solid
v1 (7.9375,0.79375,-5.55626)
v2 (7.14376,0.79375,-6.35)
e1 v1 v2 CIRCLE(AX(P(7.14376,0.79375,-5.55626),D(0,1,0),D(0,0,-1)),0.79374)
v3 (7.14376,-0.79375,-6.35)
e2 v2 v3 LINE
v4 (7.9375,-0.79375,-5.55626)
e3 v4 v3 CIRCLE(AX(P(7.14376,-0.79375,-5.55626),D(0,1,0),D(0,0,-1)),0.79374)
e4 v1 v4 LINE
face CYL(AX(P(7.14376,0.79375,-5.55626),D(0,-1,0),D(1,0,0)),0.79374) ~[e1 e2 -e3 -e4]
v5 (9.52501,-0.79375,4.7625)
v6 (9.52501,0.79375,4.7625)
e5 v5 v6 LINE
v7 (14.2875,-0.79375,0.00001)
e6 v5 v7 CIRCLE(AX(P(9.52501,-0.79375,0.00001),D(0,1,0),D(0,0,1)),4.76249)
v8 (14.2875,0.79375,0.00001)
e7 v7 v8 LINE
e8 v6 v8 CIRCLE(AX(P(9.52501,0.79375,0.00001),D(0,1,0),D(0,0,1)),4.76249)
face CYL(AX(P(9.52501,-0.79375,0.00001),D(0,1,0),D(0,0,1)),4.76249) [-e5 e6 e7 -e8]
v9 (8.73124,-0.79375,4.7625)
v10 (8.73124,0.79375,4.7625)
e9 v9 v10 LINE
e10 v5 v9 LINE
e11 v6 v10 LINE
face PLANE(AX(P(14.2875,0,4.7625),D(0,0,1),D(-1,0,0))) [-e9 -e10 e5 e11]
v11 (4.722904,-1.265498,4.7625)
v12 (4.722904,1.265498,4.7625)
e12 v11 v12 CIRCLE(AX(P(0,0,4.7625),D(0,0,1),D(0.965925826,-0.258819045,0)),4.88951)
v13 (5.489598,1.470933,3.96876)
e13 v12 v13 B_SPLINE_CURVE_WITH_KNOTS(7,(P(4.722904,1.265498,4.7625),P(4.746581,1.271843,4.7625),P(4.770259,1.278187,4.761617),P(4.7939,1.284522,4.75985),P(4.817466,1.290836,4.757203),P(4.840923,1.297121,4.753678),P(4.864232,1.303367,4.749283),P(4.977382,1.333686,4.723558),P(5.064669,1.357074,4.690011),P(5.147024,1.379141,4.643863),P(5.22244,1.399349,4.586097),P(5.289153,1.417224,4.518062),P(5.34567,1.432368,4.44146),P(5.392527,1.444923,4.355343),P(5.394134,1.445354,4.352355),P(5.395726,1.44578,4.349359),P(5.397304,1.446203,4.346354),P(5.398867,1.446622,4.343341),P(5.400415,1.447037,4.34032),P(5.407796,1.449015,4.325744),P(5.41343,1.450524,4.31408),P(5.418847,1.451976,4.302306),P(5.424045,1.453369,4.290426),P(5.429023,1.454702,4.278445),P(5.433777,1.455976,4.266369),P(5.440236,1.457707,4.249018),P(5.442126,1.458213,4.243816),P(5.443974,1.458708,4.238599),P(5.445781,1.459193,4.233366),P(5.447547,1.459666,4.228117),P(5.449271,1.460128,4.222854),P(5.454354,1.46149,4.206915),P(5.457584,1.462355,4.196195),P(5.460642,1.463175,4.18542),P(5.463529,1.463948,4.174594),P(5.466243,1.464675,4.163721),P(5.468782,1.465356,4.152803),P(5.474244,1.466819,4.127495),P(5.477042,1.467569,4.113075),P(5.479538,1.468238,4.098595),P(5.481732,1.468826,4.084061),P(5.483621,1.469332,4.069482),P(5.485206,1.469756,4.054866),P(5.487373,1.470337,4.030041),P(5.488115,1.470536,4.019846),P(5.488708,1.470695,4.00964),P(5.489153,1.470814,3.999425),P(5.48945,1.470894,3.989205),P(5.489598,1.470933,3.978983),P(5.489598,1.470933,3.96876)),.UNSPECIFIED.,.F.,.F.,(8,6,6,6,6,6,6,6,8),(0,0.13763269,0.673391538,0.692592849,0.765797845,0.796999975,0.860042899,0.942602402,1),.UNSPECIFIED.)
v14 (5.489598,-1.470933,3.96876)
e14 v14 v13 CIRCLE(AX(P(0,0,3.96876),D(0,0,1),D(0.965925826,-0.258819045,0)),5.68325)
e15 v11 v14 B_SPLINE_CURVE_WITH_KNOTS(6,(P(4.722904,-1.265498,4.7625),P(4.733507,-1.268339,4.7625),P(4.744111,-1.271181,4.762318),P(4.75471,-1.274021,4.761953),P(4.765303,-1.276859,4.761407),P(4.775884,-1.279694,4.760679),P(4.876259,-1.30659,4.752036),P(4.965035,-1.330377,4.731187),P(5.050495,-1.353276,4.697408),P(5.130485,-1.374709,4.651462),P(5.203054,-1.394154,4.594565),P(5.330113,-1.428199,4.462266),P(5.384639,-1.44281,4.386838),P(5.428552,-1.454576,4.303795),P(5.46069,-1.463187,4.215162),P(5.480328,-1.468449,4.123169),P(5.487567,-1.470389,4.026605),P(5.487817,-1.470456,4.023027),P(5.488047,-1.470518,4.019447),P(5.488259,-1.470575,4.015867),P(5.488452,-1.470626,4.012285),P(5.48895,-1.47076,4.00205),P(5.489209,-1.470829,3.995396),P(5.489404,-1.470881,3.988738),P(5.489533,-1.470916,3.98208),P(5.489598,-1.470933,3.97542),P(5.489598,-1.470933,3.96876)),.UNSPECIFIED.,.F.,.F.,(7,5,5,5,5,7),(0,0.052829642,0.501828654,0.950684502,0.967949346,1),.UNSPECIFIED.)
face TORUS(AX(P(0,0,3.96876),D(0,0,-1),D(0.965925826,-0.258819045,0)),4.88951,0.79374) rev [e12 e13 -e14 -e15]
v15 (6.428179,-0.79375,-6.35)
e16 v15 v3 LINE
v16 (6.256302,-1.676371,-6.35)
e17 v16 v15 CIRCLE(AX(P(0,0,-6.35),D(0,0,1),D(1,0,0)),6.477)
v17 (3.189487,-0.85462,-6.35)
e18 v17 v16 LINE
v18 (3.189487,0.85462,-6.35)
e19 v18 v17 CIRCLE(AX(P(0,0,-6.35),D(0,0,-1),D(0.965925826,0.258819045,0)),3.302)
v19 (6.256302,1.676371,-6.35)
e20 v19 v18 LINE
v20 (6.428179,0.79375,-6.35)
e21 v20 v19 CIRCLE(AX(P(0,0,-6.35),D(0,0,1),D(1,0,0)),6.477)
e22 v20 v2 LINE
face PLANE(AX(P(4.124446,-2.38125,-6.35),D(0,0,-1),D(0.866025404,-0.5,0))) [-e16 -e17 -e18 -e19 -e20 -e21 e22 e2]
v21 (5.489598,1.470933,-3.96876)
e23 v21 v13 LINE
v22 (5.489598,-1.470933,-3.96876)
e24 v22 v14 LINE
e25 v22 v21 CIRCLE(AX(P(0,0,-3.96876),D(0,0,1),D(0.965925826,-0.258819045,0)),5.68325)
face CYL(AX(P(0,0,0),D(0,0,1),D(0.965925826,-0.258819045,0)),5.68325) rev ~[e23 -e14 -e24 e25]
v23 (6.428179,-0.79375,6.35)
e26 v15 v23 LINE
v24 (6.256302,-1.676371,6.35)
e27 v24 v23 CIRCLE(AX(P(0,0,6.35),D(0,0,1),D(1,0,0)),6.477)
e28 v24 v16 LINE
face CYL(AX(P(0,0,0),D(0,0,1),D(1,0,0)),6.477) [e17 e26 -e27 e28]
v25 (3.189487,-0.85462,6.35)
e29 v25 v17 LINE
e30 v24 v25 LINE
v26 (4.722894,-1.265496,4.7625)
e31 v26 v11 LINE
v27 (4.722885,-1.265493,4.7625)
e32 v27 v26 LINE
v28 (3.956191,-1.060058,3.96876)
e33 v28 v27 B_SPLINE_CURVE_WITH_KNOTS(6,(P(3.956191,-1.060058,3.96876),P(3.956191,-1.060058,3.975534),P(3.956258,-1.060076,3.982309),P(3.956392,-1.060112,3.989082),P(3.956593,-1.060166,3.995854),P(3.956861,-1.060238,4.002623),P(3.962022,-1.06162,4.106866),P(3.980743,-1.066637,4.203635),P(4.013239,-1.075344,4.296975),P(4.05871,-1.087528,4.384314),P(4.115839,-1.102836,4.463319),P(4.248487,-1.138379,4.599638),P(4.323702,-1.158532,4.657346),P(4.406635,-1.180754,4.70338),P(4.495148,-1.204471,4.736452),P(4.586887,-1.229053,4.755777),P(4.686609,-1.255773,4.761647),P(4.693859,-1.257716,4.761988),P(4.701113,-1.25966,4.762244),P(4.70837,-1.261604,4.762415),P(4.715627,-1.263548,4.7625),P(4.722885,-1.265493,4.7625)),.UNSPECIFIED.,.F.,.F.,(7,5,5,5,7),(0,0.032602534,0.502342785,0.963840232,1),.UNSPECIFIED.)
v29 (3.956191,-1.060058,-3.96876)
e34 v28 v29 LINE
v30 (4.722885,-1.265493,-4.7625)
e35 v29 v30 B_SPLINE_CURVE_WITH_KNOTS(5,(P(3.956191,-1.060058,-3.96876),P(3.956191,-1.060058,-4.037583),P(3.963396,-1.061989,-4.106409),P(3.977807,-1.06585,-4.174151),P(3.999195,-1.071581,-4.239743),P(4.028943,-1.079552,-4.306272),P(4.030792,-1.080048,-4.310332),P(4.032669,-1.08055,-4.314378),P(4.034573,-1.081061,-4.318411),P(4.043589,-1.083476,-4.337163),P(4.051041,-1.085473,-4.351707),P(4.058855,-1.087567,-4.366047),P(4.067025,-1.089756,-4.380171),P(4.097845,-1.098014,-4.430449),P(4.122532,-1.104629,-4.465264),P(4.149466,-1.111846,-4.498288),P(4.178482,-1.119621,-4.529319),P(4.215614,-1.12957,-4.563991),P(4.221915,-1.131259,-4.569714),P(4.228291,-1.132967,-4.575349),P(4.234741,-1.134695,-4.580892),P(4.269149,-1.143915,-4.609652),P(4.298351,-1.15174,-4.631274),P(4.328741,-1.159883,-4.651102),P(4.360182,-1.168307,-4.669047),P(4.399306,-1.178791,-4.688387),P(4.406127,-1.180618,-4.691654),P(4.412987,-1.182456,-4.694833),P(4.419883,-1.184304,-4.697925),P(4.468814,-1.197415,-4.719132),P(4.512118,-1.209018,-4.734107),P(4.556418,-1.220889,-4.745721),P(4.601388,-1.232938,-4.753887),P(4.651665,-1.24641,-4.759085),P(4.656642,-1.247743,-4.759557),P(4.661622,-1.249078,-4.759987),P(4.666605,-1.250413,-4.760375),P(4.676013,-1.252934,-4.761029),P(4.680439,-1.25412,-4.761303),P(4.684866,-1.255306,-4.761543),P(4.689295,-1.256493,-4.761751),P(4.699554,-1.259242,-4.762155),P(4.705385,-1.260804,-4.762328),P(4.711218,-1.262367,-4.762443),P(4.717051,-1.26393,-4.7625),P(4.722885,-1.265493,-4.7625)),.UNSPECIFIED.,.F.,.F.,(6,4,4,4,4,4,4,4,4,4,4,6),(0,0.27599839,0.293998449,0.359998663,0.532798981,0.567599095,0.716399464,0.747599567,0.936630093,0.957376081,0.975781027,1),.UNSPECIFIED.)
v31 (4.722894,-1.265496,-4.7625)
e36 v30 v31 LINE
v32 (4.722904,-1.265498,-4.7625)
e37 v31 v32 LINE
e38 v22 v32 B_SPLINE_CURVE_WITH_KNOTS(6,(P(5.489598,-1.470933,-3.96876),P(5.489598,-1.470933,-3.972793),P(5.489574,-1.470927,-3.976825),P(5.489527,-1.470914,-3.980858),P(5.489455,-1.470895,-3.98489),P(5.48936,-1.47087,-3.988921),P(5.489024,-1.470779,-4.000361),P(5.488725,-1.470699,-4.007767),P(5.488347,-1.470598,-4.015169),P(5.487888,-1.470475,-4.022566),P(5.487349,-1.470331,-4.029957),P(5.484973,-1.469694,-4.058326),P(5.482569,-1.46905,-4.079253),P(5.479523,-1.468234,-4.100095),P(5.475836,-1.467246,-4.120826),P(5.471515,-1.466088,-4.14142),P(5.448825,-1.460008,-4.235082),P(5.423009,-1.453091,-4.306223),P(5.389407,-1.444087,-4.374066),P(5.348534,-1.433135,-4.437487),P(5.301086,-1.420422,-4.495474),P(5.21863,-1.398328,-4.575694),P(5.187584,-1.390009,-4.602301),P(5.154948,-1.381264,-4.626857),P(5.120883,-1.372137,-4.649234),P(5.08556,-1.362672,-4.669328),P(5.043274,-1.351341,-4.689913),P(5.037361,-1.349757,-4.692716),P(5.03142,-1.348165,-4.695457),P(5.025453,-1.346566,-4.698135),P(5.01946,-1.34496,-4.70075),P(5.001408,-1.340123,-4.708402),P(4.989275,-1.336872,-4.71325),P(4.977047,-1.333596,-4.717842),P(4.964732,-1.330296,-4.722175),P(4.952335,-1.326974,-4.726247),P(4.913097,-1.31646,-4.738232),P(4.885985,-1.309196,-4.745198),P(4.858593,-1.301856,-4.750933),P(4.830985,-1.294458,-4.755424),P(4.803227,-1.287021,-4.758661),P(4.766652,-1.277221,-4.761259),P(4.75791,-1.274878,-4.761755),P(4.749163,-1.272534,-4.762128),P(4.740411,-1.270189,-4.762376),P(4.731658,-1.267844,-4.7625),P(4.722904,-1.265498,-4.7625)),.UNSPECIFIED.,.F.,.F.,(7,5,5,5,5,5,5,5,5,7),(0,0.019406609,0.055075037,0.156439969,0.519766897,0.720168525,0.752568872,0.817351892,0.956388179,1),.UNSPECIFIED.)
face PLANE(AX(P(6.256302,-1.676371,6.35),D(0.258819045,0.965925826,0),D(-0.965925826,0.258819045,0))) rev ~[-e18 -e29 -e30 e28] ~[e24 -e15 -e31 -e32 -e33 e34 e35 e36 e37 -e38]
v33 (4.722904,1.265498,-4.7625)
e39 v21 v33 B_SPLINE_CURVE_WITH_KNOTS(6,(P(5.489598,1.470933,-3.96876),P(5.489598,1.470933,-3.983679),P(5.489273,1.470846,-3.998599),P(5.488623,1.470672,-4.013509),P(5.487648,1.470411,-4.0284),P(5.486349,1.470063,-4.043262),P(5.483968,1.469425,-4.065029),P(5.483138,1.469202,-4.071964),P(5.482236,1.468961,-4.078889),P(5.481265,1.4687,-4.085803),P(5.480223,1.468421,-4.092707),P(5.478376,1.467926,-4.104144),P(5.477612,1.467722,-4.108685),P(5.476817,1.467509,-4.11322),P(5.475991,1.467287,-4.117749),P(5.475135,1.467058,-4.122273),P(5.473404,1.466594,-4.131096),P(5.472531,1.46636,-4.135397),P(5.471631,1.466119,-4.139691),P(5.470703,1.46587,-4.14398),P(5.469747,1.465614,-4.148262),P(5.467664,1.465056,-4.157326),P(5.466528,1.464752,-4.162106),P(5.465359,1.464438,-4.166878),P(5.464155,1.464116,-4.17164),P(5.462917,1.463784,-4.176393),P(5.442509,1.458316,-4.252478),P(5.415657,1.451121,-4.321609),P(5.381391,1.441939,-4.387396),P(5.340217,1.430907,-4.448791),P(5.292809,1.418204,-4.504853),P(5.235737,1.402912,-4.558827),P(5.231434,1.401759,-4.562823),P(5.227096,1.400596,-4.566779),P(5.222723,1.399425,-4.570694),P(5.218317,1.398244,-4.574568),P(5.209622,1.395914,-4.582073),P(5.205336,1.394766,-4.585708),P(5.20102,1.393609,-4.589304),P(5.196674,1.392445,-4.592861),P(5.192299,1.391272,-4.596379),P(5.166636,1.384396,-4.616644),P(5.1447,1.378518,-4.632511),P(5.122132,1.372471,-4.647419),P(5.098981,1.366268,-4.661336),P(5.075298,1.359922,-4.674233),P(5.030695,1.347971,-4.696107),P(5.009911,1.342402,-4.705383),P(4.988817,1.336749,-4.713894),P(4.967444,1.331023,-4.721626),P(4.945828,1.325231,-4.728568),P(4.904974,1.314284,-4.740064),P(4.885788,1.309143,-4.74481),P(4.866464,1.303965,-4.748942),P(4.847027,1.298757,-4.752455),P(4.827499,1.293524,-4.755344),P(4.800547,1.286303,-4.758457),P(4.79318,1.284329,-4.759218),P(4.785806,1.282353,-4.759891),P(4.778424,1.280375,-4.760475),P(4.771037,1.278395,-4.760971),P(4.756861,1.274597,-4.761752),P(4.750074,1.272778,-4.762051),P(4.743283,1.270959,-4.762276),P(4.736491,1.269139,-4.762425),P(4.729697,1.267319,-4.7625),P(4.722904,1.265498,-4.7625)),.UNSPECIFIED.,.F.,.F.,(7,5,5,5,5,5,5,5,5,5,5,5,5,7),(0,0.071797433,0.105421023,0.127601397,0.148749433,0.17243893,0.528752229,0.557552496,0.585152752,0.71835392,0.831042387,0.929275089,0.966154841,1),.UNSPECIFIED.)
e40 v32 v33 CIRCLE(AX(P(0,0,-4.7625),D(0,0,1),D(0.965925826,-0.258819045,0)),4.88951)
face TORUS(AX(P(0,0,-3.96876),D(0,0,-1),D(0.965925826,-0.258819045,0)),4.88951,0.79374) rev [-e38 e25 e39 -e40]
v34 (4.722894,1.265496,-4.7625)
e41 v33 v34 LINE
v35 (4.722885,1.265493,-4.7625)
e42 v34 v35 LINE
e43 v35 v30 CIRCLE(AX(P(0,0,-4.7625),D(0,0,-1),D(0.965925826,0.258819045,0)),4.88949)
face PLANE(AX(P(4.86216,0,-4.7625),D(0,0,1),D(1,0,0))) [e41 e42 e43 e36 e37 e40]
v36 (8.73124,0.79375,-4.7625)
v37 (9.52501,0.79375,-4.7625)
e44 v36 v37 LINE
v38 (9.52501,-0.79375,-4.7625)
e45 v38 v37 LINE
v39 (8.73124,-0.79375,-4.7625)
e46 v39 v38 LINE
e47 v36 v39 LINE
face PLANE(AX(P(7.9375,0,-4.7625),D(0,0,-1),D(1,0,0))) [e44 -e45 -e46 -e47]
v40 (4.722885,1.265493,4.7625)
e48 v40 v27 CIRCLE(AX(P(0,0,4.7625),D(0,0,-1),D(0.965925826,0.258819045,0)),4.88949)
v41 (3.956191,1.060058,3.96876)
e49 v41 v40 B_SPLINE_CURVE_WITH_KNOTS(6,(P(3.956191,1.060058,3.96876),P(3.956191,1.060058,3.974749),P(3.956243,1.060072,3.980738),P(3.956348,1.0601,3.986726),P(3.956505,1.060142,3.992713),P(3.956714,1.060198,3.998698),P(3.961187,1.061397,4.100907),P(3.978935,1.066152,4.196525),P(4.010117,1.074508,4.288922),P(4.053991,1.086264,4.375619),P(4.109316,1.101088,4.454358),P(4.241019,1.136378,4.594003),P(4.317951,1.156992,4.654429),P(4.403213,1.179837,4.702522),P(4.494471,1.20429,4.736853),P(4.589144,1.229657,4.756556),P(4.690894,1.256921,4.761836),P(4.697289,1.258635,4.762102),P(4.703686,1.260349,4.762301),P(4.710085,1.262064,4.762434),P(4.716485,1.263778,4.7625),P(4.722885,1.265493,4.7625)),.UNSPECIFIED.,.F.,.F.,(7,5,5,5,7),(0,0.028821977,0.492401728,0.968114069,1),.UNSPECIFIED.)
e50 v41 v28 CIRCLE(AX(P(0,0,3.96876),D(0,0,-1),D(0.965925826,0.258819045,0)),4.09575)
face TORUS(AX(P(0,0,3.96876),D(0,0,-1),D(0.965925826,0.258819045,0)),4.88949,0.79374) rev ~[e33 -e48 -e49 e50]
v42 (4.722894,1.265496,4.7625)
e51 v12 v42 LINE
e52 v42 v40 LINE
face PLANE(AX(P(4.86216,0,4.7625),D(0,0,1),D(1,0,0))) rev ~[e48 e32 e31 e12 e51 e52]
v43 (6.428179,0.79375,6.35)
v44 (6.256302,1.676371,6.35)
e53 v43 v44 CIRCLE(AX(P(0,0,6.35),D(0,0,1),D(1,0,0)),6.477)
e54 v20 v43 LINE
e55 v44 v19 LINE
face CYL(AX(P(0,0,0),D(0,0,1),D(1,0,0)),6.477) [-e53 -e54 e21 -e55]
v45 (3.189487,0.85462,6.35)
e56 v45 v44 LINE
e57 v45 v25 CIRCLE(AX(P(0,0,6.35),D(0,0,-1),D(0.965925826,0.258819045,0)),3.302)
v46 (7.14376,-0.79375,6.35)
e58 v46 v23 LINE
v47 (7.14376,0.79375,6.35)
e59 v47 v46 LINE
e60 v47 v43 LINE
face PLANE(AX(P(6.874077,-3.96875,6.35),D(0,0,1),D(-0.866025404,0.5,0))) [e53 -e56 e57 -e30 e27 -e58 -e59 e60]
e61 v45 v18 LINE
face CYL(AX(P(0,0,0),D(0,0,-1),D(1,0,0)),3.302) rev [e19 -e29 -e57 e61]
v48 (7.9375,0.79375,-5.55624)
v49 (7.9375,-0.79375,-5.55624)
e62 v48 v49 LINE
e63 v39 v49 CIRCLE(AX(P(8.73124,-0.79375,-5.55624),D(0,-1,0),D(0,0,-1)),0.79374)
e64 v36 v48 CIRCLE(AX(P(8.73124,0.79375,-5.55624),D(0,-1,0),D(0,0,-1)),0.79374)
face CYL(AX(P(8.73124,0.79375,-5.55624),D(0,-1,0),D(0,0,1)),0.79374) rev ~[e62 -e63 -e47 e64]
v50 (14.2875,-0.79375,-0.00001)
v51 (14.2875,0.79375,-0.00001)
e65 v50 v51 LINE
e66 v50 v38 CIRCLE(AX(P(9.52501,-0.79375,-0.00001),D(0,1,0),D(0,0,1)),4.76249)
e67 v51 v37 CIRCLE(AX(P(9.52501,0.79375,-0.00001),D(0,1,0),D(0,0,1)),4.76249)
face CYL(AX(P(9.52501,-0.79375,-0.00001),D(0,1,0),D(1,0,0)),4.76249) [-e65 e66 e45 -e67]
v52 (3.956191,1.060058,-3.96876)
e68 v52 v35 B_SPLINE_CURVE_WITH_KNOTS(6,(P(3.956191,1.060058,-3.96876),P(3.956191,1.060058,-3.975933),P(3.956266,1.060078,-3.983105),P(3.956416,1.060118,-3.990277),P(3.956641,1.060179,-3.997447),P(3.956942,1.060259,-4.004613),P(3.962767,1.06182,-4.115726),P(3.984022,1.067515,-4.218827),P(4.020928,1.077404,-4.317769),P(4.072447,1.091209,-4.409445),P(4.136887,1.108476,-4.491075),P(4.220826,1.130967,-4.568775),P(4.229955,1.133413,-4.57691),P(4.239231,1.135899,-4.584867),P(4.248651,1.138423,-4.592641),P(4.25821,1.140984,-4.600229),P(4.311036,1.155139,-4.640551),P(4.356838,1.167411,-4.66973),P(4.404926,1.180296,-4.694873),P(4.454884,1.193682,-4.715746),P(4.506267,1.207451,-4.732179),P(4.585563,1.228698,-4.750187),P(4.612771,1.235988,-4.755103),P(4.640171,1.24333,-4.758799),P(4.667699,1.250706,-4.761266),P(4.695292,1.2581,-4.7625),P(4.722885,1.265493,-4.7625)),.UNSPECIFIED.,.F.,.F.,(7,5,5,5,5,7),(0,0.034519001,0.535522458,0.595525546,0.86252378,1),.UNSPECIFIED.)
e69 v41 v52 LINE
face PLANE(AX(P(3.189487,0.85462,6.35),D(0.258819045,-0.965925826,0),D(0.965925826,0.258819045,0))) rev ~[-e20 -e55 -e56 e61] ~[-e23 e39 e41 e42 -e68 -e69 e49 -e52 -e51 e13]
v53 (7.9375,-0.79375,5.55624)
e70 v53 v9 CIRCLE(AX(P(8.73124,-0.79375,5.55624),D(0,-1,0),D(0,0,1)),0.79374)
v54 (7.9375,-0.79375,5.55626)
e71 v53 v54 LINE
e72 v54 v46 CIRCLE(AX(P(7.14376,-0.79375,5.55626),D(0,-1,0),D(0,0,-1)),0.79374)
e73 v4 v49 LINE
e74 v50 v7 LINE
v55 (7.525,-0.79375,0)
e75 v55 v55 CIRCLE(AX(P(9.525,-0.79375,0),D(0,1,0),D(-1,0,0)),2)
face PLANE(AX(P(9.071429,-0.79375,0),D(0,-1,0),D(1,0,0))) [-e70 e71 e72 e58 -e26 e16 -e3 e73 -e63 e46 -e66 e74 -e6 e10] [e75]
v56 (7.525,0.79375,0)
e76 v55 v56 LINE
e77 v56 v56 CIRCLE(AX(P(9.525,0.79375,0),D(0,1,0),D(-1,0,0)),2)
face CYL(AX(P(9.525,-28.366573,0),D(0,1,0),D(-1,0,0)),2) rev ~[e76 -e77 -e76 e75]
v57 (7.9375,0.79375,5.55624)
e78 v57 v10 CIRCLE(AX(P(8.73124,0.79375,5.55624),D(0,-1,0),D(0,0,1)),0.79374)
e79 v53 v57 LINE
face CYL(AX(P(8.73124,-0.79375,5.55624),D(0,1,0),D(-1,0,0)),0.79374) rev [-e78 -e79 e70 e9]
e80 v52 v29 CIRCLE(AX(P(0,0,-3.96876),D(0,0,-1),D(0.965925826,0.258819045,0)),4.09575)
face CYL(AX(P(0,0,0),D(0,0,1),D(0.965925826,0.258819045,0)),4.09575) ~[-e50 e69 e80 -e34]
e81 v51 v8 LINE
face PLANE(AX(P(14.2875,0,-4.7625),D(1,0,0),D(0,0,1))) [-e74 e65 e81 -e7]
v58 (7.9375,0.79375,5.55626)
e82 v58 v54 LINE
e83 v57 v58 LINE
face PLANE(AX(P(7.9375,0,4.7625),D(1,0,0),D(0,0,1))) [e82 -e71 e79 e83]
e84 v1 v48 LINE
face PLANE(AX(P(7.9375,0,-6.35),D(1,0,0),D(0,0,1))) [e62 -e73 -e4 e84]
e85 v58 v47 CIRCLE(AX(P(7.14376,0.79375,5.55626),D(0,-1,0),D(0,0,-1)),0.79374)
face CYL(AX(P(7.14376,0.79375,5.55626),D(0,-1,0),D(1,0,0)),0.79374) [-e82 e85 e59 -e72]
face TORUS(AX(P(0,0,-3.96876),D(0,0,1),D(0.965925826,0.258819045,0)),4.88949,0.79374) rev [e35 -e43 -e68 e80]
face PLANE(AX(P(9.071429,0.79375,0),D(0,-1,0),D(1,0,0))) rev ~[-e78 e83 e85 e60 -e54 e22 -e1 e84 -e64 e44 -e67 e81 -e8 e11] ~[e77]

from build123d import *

# Parameters (mm, degrees)
F0_R      = 6.477
F0_R_2    = 3.302
F1_DEPTH  = 6.35
F3_DEPTH  = 0.79375
F4_R      = 0.79374
F5_R      = 4.76249
F7_D      = 4
F8_COUNT  = 12
F10_DEPTH = 12.701
F12_DEPTH = 4.7625
F13_R     = 0.79374


# Not quite as in the source:
# - a fillet or chamfer is up to 0.001 mm smaller than in the source, because OpenCascade refuses the exact size


with BuildPart() as f1:
    # F0 (on Top) → F1 (new body, symmetric)
    with BuildSketch(Plane.XY):
        Circle(F0_R)
        Circle(F0_R_2, mode=Mode.SUBTRACT)
    extrude(amount=F1_DEPTH, both=True)

    # F2 (on Front) → F3 (join, symmetric)
    with BuildSketch(Plane.XZ):
        Polygon((7.9375, 4.7625), (7.9375, 6.35), (4.7625, 6.35), (4.7625, -6.35), (7.9375, -6.35), (7.9375, -4.7625), (14.2875, -4.7625), (14.2875, 0), (14.2875, 4.7625), align=None)
    extrude(amount=F3_DEPTH, both=True)

    # F4 (radius 0.79375 in the source; OpenCascade refuses exactly that, so slightly less here)
    f4_edges = [f1.edges().sort_by_distance(p)[0] for p in [
        (7.9375, 0, 6.35),
        (7.9375, 0, 4.7625),
        (7.9375, 0, -6.35),
        (7.9375, 0, -4.7625),
    ]]
    fillet(f4_edges, radius=F4_R)

    # F5 (radius 4.7625 in the source; OpenCascade refuses exactly that, so slightly less here)
    f5_edges = [f1.edges().sort_by_distance(p)[0] for p in [
        (14.2875, 0, -4.7625),
        (14.2875, 0, 4.7625),
    ]]
    fillet(f5_edges, radius=F5_R)

    # F7 (through all)
    with Locations(Plane.XZ.offset(0.79375)):
        with Locations((9.525, 0)):
            Hole(F7_D / 2)

    # F8: F1 ×12 about axis
    f8_axis = Axis((0, 0, 6.35), (0, 0, 1))


with BuildPart() as f1_1:
    add(f1.part)
    for i in range(1, F8_COUNT):
        add(f1.part.rotate(f8_axis, i * 360 / F8_COUNT))

    # F9 (on face) → F10 (cut, through all)
    with BuildSketch(Plane.XY.offset(6.35)):
        with BuildLine():
            Line((3.1894870784, 0.8546204869), (6.2563015769, 1.6763709551))
            Line((6.2563015769, 1.6763709551), (15.3340724923, 4.108752341))
            ThreePointArc((15.3340724923, 4.108752341), (-15.875, 0), (15.3340724923, -4.108752341))
            Line((15.3340724923, -4.108752341), (6.2563015769, -1.6763709551))
            Line((6.2563015769, -1.6763709551), (3.1894870784, -0.8546204869))
            Line((3.1894870784, -0.8546204869), (3.1894870784, 0.8546204869))
        make_face()
    extrude(amount=-F10_DEPTH, mode=Mode.SUBTRACT)

    # F11 (on Top) → F12 (cut, symmetric)
    with BuildSketch(Plane.XY):
        with BuildLine():
            Line((3.956190703, -1.060058104), (4.7228943276, -1.265495721))
            Line((4.7228943276, -1.265495721), (5.4895979523, -1.4709333381))
            ThreePointArc((5.4895979523, -1.4709333381), (5.68325, 0), (5.4895979523, 1.4709333381))
            Line((5.4895979523, 1.4709333381), (4.7228943276, 1.265495721))
            Line((4.7228943276, 1.265495721), (3.956190703, 1.060058104))
            ThreePointArc((3.956190703, 1.060058104), (4.09575, 0), (3.956190703, -1.060058104))
        make_face()
    extrude(amount=F12_DEPTH, both=True, mode=Mode.SUBTRACT)

    # F13 (radius 0.79375 in the source; OpenCascade refuses exactly that, so slightly less here)
    f13_edges = [f1_1.edges().sort_by_distance(p)[0] for p in [
        (5.68325, 0, -4.7625),
        (4.09575, 0, -4.7625),
        (4.09575, 0, 4.7625),
        (5.68325, 0, 4.7625),
    ]]
    fillet(f13_edges, radius=F13_R)


solid = f1_1.part
